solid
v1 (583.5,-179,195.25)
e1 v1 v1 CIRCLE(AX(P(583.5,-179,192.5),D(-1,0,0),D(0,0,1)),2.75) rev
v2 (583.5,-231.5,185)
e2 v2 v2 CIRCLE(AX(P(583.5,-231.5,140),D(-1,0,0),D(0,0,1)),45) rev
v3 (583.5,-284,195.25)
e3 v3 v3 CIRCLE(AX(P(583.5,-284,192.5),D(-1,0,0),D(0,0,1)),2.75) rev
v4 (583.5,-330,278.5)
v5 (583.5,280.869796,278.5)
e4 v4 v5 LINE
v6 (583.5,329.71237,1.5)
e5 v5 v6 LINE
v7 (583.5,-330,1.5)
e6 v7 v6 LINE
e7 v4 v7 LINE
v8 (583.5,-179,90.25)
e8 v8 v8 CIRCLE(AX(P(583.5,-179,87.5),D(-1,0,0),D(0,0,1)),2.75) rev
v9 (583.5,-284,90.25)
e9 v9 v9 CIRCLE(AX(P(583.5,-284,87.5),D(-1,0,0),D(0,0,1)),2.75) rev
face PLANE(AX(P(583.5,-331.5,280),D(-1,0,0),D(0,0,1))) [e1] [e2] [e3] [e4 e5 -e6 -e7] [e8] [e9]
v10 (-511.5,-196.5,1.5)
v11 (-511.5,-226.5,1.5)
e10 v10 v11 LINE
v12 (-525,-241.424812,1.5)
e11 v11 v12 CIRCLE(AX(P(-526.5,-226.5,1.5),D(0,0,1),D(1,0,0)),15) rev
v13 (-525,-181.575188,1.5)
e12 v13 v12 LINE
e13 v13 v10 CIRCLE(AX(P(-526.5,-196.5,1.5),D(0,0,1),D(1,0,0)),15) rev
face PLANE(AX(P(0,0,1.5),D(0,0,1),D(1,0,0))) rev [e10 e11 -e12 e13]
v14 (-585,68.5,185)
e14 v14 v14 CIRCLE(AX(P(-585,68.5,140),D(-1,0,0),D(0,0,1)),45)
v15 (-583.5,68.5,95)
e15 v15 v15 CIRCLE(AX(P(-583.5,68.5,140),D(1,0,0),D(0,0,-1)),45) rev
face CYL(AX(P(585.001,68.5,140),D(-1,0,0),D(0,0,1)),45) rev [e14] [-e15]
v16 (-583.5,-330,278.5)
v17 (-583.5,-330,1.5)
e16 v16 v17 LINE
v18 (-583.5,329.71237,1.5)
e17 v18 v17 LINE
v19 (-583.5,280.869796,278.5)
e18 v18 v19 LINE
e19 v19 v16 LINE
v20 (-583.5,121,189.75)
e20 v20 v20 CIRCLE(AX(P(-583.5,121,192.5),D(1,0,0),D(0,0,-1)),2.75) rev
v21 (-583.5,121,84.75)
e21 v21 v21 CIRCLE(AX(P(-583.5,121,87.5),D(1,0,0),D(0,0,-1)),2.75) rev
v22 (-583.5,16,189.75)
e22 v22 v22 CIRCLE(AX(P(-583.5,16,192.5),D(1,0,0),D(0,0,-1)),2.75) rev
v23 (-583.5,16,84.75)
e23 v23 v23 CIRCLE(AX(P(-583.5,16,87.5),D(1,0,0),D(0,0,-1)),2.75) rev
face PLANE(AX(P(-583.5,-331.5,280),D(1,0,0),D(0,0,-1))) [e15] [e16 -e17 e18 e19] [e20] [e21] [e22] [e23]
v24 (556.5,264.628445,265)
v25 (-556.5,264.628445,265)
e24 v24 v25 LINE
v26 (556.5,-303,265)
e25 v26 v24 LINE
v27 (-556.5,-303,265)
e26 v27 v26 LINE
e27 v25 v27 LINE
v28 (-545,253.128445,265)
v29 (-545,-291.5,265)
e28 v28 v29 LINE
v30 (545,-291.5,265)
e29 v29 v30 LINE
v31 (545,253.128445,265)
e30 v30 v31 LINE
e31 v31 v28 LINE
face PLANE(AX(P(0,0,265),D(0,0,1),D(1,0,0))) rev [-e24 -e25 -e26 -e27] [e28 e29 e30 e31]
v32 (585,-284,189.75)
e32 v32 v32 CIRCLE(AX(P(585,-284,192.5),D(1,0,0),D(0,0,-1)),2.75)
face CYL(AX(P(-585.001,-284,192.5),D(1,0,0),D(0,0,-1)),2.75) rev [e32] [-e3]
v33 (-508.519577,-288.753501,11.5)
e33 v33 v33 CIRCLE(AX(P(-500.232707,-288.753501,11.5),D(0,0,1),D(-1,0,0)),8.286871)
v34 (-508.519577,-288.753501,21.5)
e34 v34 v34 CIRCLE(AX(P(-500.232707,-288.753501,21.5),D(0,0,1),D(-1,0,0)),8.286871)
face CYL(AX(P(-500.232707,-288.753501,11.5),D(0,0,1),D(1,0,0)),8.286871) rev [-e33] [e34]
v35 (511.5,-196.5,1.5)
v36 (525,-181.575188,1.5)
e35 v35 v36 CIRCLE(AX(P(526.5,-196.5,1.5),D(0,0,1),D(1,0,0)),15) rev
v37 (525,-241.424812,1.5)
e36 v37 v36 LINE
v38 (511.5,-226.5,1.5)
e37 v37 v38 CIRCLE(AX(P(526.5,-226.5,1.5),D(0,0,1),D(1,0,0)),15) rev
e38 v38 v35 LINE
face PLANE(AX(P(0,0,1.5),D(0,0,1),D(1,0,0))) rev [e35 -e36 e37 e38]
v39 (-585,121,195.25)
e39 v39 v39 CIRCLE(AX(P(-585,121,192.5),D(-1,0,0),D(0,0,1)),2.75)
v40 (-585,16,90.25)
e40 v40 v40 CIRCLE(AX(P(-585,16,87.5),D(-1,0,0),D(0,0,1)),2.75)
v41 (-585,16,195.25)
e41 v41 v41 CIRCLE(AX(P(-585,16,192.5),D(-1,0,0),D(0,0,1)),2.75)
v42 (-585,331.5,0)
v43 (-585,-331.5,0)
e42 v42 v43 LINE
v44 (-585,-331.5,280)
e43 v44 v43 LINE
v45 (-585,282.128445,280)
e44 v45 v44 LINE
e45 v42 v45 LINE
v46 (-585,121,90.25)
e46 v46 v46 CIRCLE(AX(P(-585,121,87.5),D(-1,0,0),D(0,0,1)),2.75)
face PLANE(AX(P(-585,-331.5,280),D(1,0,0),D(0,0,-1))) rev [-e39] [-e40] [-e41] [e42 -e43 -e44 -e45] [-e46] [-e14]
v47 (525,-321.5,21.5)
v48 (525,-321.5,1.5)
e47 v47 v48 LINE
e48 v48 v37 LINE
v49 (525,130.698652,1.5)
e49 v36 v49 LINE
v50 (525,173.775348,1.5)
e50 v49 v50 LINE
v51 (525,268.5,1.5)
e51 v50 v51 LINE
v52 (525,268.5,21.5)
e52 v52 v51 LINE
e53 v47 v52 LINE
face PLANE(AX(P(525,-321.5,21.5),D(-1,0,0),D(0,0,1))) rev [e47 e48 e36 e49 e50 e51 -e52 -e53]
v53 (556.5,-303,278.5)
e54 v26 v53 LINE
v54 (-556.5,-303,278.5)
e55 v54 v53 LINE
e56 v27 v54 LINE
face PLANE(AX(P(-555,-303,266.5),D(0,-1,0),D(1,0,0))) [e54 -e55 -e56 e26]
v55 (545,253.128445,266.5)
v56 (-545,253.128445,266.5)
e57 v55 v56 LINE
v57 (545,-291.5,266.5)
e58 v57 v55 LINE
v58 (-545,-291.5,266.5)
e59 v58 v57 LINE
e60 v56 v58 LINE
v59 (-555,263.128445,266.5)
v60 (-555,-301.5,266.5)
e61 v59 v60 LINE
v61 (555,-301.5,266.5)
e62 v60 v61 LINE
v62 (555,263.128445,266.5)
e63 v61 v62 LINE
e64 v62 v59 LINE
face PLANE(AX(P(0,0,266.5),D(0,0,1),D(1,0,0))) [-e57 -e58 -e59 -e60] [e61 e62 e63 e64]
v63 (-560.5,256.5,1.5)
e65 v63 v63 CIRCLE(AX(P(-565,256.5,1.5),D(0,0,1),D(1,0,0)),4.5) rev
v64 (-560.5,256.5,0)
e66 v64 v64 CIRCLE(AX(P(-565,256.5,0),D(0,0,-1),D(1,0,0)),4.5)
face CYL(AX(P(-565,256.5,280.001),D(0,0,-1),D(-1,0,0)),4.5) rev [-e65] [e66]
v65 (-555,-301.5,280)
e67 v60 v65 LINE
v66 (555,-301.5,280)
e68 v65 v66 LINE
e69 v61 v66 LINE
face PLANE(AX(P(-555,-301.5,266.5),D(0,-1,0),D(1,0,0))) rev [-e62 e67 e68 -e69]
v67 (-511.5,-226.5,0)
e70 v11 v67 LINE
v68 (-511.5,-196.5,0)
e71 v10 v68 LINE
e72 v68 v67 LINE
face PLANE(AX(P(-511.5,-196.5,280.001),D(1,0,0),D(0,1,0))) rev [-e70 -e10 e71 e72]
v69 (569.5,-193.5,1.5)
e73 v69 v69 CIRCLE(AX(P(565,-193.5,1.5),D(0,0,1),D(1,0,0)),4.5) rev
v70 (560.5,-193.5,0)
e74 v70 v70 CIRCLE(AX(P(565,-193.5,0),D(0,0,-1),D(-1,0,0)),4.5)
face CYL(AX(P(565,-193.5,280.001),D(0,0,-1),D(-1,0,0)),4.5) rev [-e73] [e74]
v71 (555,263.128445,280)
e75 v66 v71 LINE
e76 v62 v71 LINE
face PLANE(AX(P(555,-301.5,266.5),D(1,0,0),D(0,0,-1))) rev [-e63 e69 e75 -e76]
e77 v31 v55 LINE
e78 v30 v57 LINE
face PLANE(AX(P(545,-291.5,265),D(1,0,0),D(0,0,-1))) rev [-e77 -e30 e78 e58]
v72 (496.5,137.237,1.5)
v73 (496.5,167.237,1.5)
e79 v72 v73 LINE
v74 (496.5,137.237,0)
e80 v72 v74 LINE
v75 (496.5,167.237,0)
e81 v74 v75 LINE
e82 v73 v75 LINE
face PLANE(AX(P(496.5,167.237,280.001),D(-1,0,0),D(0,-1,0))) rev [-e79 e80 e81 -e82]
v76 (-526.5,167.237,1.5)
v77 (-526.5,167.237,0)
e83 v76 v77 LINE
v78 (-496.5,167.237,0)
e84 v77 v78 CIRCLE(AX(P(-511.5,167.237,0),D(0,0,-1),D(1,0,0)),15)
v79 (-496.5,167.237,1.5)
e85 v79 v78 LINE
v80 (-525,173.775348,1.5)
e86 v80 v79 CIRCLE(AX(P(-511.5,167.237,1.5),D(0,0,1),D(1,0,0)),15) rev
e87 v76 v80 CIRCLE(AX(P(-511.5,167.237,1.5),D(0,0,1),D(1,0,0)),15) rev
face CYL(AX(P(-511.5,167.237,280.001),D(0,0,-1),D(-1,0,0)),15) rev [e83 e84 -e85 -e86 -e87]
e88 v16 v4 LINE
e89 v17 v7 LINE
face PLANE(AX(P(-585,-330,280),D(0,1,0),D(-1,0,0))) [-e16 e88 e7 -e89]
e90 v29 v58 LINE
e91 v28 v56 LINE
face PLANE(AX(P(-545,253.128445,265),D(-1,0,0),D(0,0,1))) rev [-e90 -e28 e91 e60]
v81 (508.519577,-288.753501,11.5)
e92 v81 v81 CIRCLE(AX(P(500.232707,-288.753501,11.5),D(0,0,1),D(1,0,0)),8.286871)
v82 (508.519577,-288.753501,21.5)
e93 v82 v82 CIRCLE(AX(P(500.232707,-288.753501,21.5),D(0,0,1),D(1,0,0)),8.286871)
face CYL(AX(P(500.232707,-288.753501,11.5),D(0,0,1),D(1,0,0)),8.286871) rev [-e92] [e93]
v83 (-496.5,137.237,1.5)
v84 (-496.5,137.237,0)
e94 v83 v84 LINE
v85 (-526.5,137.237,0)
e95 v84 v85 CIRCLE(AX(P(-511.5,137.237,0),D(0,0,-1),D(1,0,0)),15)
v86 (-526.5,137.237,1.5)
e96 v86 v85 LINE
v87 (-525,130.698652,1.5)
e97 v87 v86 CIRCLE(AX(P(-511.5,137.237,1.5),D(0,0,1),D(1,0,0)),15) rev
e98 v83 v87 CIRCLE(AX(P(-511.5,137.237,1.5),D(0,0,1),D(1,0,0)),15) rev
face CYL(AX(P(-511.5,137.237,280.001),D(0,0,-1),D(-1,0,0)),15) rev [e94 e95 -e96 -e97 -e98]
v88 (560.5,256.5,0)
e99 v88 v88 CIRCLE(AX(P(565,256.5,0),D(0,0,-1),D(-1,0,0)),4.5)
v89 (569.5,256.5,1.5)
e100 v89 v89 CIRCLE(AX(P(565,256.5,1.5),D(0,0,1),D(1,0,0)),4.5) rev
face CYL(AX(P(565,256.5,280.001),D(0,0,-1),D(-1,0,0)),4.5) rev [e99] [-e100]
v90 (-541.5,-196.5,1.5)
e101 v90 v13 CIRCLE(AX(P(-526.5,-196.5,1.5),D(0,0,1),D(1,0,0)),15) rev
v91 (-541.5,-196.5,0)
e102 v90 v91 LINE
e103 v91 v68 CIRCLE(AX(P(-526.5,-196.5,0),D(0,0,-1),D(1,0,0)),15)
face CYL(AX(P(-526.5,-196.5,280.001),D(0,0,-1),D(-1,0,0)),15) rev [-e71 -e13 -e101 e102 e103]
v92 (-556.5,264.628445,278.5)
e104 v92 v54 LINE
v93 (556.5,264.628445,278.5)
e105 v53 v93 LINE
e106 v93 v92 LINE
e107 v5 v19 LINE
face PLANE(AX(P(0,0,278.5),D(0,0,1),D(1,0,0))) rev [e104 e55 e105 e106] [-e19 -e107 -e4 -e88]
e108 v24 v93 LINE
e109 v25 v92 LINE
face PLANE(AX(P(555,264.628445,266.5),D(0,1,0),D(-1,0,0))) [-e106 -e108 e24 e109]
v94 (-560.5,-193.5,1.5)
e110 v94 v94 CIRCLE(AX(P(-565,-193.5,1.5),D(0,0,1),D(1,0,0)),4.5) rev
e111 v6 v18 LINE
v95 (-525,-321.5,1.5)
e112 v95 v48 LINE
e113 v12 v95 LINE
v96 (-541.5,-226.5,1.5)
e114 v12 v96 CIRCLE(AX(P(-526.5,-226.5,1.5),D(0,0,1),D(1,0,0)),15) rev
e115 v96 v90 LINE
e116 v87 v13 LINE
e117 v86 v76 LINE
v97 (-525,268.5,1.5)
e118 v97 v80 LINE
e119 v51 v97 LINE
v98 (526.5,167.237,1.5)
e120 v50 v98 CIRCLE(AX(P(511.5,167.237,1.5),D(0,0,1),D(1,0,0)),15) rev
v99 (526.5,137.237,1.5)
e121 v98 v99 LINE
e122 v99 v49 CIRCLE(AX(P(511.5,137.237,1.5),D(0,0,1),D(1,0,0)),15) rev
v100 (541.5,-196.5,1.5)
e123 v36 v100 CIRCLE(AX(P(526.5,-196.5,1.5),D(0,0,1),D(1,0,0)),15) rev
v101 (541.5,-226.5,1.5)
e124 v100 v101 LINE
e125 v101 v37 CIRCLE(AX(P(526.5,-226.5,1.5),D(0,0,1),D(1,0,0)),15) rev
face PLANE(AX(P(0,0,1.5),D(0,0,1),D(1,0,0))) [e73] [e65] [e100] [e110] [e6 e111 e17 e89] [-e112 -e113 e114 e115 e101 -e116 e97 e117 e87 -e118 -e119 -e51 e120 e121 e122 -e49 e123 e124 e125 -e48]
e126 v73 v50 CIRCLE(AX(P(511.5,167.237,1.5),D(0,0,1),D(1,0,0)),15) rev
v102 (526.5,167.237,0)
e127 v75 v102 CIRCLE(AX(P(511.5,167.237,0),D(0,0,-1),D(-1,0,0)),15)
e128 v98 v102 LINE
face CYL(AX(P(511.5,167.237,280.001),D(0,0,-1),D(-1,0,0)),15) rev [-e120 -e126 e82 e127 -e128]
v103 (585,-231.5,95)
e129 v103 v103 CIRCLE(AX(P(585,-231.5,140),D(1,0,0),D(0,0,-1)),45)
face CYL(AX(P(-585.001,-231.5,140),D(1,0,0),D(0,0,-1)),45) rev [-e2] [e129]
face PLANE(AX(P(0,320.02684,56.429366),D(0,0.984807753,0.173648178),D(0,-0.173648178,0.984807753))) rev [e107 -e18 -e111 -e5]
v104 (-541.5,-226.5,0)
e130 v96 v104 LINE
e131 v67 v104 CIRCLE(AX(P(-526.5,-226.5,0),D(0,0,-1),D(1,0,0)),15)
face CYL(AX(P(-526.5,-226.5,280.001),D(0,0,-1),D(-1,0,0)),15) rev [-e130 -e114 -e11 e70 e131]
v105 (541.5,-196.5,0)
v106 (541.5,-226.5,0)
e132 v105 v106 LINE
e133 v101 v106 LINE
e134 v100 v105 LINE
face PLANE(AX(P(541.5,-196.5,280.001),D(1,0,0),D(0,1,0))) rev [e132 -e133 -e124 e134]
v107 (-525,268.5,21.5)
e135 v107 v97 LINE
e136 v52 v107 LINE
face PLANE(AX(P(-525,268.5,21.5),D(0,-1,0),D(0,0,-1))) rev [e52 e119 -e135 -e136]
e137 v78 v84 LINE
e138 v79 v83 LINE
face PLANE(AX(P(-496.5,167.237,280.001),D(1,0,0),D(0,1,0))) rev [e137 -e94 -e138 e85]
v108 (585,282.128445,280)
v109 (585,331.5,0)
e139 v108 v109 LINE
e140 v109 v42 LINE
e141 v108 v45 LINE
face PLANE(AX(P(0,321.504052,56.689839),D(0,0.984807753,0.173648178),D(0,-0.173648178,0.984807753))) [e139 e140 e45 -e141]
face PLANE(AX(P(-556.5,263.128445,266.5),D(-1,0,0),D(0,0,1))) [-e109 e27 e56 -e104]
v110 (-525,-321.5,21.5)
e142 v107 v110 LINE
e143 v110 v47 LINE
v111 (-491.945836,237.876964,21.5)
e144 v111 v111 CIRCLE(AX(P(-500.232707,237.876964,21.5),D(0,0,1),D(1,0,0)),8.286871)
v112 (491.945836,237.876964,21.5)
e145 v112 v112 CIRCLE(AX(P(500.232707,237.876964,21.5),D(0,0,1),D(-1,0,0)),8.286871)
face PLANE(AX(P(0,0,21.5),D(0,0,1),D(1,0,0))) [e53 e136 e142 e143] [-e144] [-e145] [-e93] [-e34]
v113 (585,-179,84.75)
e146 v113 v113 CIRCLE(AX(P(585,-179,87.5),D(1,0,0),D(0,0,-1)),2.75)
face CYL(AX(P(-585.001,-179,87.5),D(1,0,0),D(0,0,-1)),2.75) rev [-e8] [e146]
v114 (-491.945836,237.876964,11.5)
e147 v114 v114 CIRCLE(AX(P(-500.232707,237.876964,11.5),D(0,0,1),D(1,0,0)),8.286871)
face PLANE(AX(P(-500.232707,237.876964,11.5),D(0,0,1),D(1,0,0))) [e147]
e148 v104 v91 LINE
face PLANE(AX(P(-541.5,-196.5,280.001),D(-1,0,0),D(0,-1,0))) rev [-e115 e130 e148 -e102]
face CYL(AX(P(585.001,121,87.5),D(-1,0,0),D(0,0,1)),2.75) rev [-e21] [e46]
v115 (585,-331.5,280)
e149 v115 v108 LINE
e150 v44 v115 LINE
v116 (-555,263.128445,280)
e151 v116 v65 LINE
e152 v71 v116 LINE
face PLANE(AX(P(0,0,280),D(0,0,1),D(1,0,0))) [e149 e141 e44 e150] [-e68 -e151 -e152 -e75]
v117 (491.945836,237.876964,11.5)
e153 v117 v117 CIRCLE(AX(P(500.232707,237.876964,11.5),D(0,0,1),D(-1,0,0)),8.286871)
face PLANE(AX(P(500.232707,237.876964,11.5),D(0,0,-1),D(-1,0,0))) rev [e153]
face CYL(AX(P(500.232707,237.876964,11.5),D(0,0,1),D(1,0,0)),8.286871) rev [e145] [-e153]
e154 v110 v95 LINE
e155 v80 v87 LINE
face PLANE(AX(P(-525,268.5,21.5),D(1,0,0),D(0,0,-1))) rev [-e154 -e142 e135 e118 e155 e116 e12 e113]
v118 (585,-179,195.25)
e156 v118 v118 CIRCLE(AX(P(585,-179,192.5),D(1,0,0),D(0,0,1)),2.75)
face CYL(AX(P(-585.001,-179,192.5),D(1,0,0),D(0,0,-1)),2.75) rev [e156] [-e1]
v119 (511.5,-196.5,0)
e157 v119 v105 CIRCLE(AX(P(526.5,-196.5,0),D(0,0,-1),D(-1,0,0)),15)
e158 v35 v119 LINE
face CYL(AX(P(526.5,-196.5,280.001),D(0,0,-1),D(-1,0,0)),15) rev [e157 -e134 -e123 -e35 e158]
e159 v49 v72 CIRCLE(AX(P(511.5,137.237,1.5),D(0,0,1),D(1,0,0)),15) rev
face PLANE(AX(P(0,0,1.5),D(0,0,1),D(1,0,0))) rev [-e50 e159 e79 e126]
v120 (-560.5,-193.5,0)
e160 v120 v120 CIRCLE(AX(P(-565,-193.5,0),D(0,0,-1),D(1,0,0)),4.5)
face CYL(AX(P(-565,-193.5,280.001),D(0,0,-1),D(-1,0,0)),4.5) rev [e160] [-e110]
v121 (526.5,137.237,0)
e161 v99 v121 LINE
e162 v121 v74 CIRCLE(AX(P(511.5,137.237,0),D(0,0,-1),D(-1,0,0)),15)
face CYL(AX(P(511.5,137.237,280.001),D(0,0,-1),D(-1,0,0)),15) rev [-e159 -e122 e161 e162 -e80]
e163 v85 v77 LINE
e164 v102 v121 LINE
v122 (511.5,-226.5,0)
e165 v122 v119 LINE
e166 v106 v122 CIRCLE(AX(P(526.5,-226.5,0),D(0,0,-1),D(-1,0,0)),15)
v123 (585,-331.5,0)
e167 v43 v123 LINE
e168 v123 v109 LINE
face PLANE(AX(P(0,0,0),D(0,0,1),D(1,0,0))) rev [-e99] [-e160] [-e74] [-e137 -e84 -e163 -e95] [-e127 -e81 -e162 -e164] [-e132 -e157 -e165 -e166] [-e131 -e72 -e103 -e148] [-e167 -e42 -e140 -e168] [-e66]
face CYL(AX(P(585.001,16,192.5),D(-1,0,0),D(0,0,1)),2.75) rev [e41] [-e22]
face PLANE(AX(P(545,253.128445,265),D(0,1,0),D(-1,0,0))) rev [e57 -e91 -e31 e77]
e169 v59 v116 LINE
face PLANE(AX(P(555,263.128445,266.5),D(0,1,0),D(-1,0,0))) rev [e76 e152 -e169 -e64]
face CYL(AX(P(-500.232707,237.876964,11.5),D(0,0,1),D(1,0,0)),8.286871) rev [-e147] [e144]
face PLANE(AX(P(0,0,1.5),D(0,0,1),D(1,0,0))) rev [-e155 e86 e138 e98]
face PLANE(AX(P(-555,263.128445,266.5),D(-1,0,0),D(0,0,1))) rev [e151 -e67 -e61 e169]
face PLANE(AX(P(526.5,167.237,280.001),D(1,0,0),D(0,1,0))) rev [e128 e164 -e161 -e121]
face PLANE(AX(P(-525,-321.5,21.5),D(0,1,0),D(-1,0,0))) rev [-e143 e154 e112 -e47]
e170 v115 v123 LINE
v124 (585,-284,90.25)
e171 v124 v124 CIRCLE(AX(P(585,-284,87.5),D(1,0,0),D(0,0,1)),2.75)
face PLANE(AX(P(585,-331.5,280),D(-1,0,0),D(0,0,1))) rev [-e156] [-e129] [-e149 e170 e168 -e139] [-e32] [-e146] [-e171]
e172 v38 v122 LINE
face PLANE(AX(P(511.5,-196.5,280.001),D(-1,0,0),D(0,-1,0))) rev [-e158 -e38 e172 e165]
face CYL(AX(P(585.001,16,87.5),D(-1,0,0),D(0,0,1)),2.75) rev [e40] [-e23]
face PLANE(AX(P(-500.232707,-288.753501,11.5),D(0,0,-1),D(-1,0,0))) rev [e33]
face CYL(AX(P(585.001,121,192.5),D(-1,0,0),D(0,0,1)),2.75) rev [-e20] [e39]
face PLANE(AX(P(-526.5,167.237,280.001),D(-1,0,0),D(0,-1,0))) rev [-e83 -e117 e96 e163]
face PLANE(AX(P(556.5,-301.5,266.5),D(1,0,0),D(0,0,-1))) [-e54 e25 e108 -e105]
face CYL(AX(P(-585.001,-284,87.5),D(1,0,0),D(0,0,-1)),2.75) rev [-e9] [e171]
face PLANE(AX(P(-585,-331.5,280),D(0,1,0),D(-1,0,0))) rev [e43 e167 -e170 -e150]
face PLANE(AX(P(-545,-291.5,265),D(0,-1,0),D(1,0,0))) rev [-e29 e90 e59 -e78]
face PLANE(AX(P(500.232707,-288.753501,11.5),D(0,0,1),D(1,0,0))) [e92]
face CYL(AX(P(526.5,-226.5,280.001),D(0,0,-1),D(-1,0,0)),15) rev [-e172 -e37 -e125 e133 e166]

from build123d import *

# Parameters (mm, degrees)
SKETCH_1_W          = 1170
SKETCH_1_H          = 663
EXTRUDE_1_DEPTH     = 280
SKETCH_2_W          = 1110
SKETCH_2_H          = 564.628445402
CUT_EXTRUDE_1_DEPTH = 13.5
SKETCH_4_W          = 1090
SKETCH_4_H          = 544.628445402
CUT_EXTRUDE_2_DEPTH = 1.5
SHELL_START         = -583.5
SHELL_1_DEPTH       = 1167
SHELL_1_2_OUTLINE_W = 567.628445402
SHELL_1_2_OUTLINE_H = 13.5
SHELL_1_2_DEPTH     = 27
SHELL_START_2       = 556.5
SHELL_1_3_OUTLINE_W = 567.628445402
SHELL_1_3_OUTLINE_H = 13.5
SHELL_1_3_DEPTH     = 27
CUT_EXTRUDE_3_REACH = 730.366
SKETCH_5_R          = 4.5
CUT_EXTRUDE_4_REACH = 1249.875
SKETCH_6_R          = 45
SKETCH_6_R_2        = 2.75
CUT_EXTRUDE_6_REACH = 1249.875
SKETCH_8_R          = 45
SKETCH_8_R_2        = 2.75
SKETCH_9_W          = 1050
SKETCH_9_H          = 590
EXTRUDE_2_DEPTH     = 20
SKETCH_10_R         = 8.286870523
CUT_EXTRUDE_7_DEPTH = 10


# Read off the part's stored shape, not the designer's step: 抽壳1
with BuildPart() as part:
    # 草图1 → 凸台-拉伸1 (new body)
    with BuildSketch(Plane.XY):
        Rectangle(SKETCH_1_W, SKETCH_1_H)
    extrude(amount=EXTRUDE_1_DEPTH)

    # Split Bodies 1
    split(bisect_by=Plane(origin=(0, 321.504051895, 56.689838756), x_dir=(0, -0.17364817766691376, 0.984807753012211), z_dir=(0, 0.984807753012211, 0.17364817766691376)), keep=Keep.BOTTOM)

    # 草图2 → 切除-拉伸1 (cut)
    with BuildSketch(Plane.XY.offset(280)):
        with Locations((0, -19.185777299)):
            Rectangle(SKETCH_2_W, SKETCH_2_H)
    extrude(amount=-CUT_EXTRUDE_1_DEPTH, mode=Mode.SUBTRACT)

    # 草图4 → 切除-拉伸2 (cut)
    with BuildSketch(Plane.XY.offset(266.5)):
        with Locations((0, -19.185777299)):
            Rectangle(SKETCH_4_W, SKETCH_4_H)
    extrude(amount=-CUT_EXTRUDE_2_DEPTH, mode=Mode.SUBTRACT)

    # 抽壳1 outline → 抽壳1 (cut)
    with BuildSketch(Plane.YZ.offset(SHELL_START)):
        Polygon((-330, 1.5), (329.712369611, 1.5), (280.869795955, 278.5), (264.628445402, 278.5), (264.628445402, 265), (-303, 265), (-303, 278.5), (-330, 278.5), align=None)
    extrude(amount=SHELL_1_DEPTH, mode=Mode.SUBTRACT)

    # Shell 1 2 outline → Shell 1 2 (cut)
    with BuildSketch(Plane.YZ.offset(SHELL_START)):
        with Locations((-19.185777299, 271.75)):
            Rectangle(SHELL_1_2_OUTLINE_W, SHELL_1_2_OUTLINE_H)
    extrude(amount=SHELL_1_2_DEPTH, mode=Mode.SUBTRACT)

    # Shell 1 3 outline → Shell 1 3 (cut)
    with BuildSketch(Plane.YZ.offset(SHELL_START_2)):
        with Locations((-19.185777299, 271.75)):
            Rectangle(SHELL_1_3_OUTLINE_W, SHELL_1_3_OUTLINE_H)
    extrude(amount=SHELL_1_3_DEPTH, mode=Mode.SUBTRACT)

    # 草图5 → 切除-拉伸3 (cut, up to next)
    with BuildSketch(Plane(origin=(0, 0, 0), x_dir=(-1, 0, 0), z_dir=(0, 0, -1)), mode=Mode.PRIVATE) as cut_extrude_3_sk1:
        with Locations((-565, 256.5)):
            Circle(SKETCH_5_R)
    cut_extrude_3_tool1 = extrude(cut_extrude_3_sk1.sketch, amount=-CUT_EXTRUDE_3_REACH, mode=Mode.PRIVATE) & part.part
    # 草图5 → 切除-拉伸3 (cut, up to next)
    with BuildSketch(Plane(origin=(0, 0, 0), x_dir=(-1, 0, 0), z_dir=(0, 0, -1)), mode=Mode.PRIVATE) as cut_extrude_3_sk2:
        with Locations((-565, -193.5)):
            Circle(SKETCH_5_R)
    cut_extrude_3_tool2 = extrude(cut_extrude_3_sk2.sketch, amount=-CUT_EXTRUDE_3_REACH, mode=Mode.PRIVATE) & part.part
    # 草图5 → 切除-拉伸3 (cut, up to next)
    with BuildSketch(Plane(origin=(0, 0, 0), x_dir=(-1, 0, 0), z_dir=(0, 0, -1)), mode=Mode.PRIVATE) as cut_extrude_3_sk3:
        with Locations(Location((565, 256.5, 0), (0, 0, 180))):
            Circle(SKETCH_5_R)
    cut_extrude_3_tool3 = extrude(cut_extrude_3_sk3.sketch, amount=-CUT_EXTRUDE_3_REACH, mode=Mode.PRIVATE) & part.part
    # 草图5 → 切除-拉伸3 (cut, up to next)
    with BuildSketch(Plane(origin=(0, 0, 0), x_dir=(-1, 0, 0), z_dir=(0, 0, -1)), mode=Mode.PRIVATE) as cut_extrude_3_sk4:
        with Locations(Location((565, -193.5, 0), (0, 0, 180))):
            Circle(SKETCH_5_R)
    cut_extrude_3_tool4 = extrude(cut_extrude_3_sk4.sketch, amount=-CUT_EXTRUDE_3_REACH, mode=Mode.PRIVATE) & part.part
    # 草图5 → 切除-拉伸3 (cut, up to next)
    with BuildSketch(Plane(origin=(0, 0, 0), x_dir=(-1, 0, 0), z_dir=(0, 0, -1)), mode=Mode.PRIVATE) as cut_extrude_3_sk5:
        with BuildLine():
            Line((511.5, -196.5), (511.5, -226.5))
            ThreePointArc((511.5, -226.5), (526.5, -241.5), (541.5, -226.5))
            Line((541.5, -226.5), (541.5, -196.5))
            ThreePointArc((541.5, -196.5), (526.5, -181.5), (511.5, -196.5))
        make_face()
    cut_extrude_3_tool5 = extrude(cut_extrude_3_sk5.sketch, amount=-CUT_EXTRUDE_3_REACH, mode=Mode.PRIVATE) & part.part
    # 草图5 → 切除-拉伸3 (cut, up to next)
    with BuildSketch(Plane(origin=(0, 0, 0), x_dir=(-1, 0, 0), z_dir=(0, 0, -1)), mode=Mode.PRIVATE) as cut_extrude_3_sk6:
        with BuildLine():
            Line((526.5, 167.237), (526.5, 137.237))
            ThreePointArc((526.5, 137.237), (511.5, 122.237), (496.5, 137.237))
            Line((496.5, 137.237), (496.5, 167.237))
            ThreePointArc((496.5, 167.237), (511.5, 182.237), (526.5, 167.237))
        make_face()
    cut_extrude_3_tool6 = extrude(cut_extrude_3_sk6.sketch, amount=-CUT_EXTRUDE_3_REACH, mode=Mode.PRIVATE) & part.part
    # 草图5 → 切除-拉伸3 (cut, up to next)
    with BuildSketch(Plane(origin=(0, 0, 0), x_dir=(-1, 0, 0), z_dir=(0, 0, -1)), mode=Mode.PRIVATE) as cut_extrude_3_sk7:
        with BuildLine():
            Line((-541.5, -196.5), (-541.5, -226.5))
            ThreePointArc((-541.5, -226.5), (-526.5, -241.5), (-511.5, -226.5))
            Line((-511.5, -226.5), (-511.5, -196.5))
            ThreePointArc((-511.5, -196.5), (-526.5, -181.5), (-541.5, -196.5))
        make_face()
    cut_extrude_3_tool7 = extrude(cut_extrude_3_sk7.sketch, amount=-CUT_EXTRUDE_3_REACH, mode=Mode.PRIVATE) & part.part
    # 草图5 → 切除-拉伸3 (cut, up to next)
    with BuildSketch(Plane(origin=(0, 0, 0), x_dir=(-1, 0, 0), z_dir=(0, 0, -1)), mode=Mode.PRIVATE) as cut_extrude_3_sk8:
        with BuildLine():
            Line((-496.5, 167.237), (-496.5, 137.237))
            ThreePointArc((-496.5, 137.237), (-511.5, 122.237), (-526.5, 137.237))
            Line((-526.5, 137.237), (-526.5, 167.237))
            ThreePointArc((-526.5, 167.237), (-511.5, 182.237), (-496.5, 167.237))
        make_face()
    cut_extrude_3_tool8 = extrude(cut_extrude_3_sk8.sketch, amount=-CUT_EXTRUDE_3_REACH, mode=Mode.PRIVATE) & part.part
    add(cut_extrude_3_tool1.solids().sort_by_distance((565, 256.5, 0))[0], mode=Mode.SUBTRACT)
    add(cut_extrude_3_tool2.solids().sort_by_distance((565, -193.5, 0))[0], mode=Mode.SUBTRACT)
    add(cut_extrude_3_tool3.solids().sort_by_distance((-565, 256.5, 0))[0], mode=Mode.SUBTRACT)
    add(cut_extrude_3_tool4.solids().sort_by_distance((-565, -193.5, 0))[0], mode=Mode.SUBTRACT)
    add(cut_extrude_3_tool5.solids().sort_by_distance((-526.5, -211.5, 0))[0], mode=Mode.SUBTRACT)
    add(cut_extrude_3_tool6.solids().sort_by_distance((-511.5, 152.237, 0))[0], mode=Mode.SUBTRACT)
    add(cut_extrude_3_tool7.solids().sort_by_distance((526.5, -211.5, 0))[0], mode=Mode.SUBTRACT)
    add(cut_extrude_3_tool8.solids().sort_by_distance((511.5, 152.237, 0))[0], mode=Mode.SUBTRACT)

    # 草图6 → 切除-拉伸4 (cut, up to next)
    with BuildSketch(Plane(origin=(585, 0, 0), x_dir=(0, 0, -1), z_dir=(1, 0, 0)), mode=Mode.PRIVATE) as cut_extrude_4_sk1:
        with Locations((-140, -231.5)):
            Circle(SKETCH_6_R)
    cut_extrude_4_tool1 = extrude(cut_extrude_4_sk1.sketch, amount=-CUT_EXTRUDE_4_REACH, mode=Mode.PRIVATE) & part.part
    # 草图6 → 切除-拉伸4 (cut, up to next)
    with BuildSketch(Plane(origin=(585, 0, 0), x_dir=(0, 0, -1), z_dir=(1, 0, 0)), mode=Mode.PRIVATE) as cut_extrude_4_sk2:
        with Locations((-87.5, -179)):
            Circle(SKETCH_6_R_2)
    cut_extrude_4_tool2 = extrude(cut_extrude_4_sk2.sketch, amount=-CUT_EXTRUDE_4_REACH, mode=Mode.PRIVATE) & part.part
    # 草图6 → 切除-拉伸4 (cut, up to next)
    with BuildSketch(Plane(origin=(585, 0, 0), x_dir=(0, 0, -1), z_dir=(1, 0, 0)), mode=Mode.PRIVATE) as cut_extrude_4_sk3:
        with Locations(Location((-192.5, -179, 0), (0, 0, 180))):
            Circle(SKETCH_6_R_2)
    cut_extrude_4_tool3 = extrude(cut_extrude_4_sk3.sketch, amount=-CUT_EXTRUDE_4_REACH, mode=Mode.PRIVATE) & part.part
    # 草图6 → 切除-拉伸4 (cut, up to next)
    with BuildSketch(Plane(origin=(585, 0, 0), x_dir=(0, 0, -1), z_dir=(1, 0, 0)), mode=Mode.PRIVATE) as cut_extrude_4_sk4:
        with Locations((-192.5, -284)):
            Circle(SKETCH_6_R_2)
    cut_extrude_4_tool4 = extrude(cut_extrude_4_sk4.sketch, amount=-CUT_EXTRUDE_4_REACH, mode=Mode.PRIVATE) & part.part
    # 草图6 → 切除-拉伸4 (cut, up to next)
    with BuildSketch(Plane(origin=(585, 0, 0), x_dir=(0, 0, -1), z_dir=(1, 0, 0)), mode=Mode.PRIVATE) as cut_extrude_4_sk5:
        with Locations(Location((-87.5, -284, 0), (0, 0, 180))):
            Circle(SKETCH_6_R_2)
    cut_extrude_4_tool5 = extrude(cut_extrude_4_sk5.sketch, amount=-CUT_EXTRUDE_4_REACH, mode=Mode.PRIVATE) & part.part
    add(cut_extrude_4_tool1.solids().sort_by_distance((585, -231.5, 140))[0], mode=Mode.SUBTRACT)
    add(cut_extrude_4_tool2.solids().sort_by_distance((585, -179, 87.5))[0], mode=Mode.SUBTRACT)
    add(cut_extrude_4_tool3.solids().sort_by_distance((585, -179, 192.5))[0], mode=Mode.SUBTRACT)
    add(cut_extrude_4_tool4.solids().sort_by_distance((585, -284, 192.5))[0], mode=Mode.SUBTRACT)
    add(cut_extrude_4_tool5.solids().sort_by_distance((585, -284, 87.5))[0], mode=Mode.SUBTRACT)

    # 草图8 → 切除-拉伸6 (cut, up to next)
    with BuildSketch(Plane.ZY.offset(585), mode=Mode.PRIVATE) as cut_extrude_6_sk1:
        with Locations((140, 68.5)):
            Circle(SKETCH_8_R)
    cut_extrude_6_tool1 = extrude(cut_extrude_6_sk1.sketch, amount=-CUT_EXTRUDE_6_REACH, mode=Mode.PRIVATE) & part.part
    # 草图8 → 切除-拉伸6 (cut, up to next)
    with BuildSketch(Plane.ZY.offset(585), mode=Mode.PRIVATE) as cut_extrude_6_sk2:
        with Locations((192.5, 16)):
            Circle(SKETCH_8_R_2)
    cut_extrude_6_tool2 = extrude(cut_extrude_6_sk2.sketch, amount=-CUT_EXTRUDE_6_REACH, mode=Mode.PRIVATE) & part.part
    # 草图8 → 切除-拉伸6 (cut, up to next)
    with BuildSketch(Plane.ZY.offset(585), mode=Mode.PRIVATE) as cut_extrude_6_sk3:
        with Locations((87.5, 16)):
            Circle(SKETCH_8_R_2)
    cut_extrude_6_tool3 = extrude(cut_extrude_6_sk3.sketch, amount=-CUT_EXTRUDE_6_REACH, mode=Mode.PRIVATE) & part.part
    # 草图8 → 切除-拉伸6 (cut, up to next)
    with BuildSketch(Plane.ZY.offset(585), mode=Mode.PRIVATE) as cut_extrude_6_sk4:
        with Locations((87.5, 121)):
            Circle(SKETCH_8_R_2)
    cut_extrude_6_tool4 = extrude(cut_extrude_6_sk4.sketch, amount=-CUT_EXTRUDE_6_REACH, mode=Mode.PRIVATE) & part.part
    # 草图8 → 切除-拉伸6 (cut, up to next)
    with BuildSketch(Plane.ZY.offset(585), mode=Mode.PRIVATE) as cut_extrude_6_sk5:
        with Locations((192.5, 121)):
            Circle(SKETCH_8_R_2)
    cut_extrude_6_tool5 = extrude(cut_extrude_6_sk5.sketch, amount=-CUT_EXTRUDE_6_REACH, mode=Mode.PRIVATE) & part.part
    add(cut_extrude_6_tool1.solids().sort_by_distance((-585, 68.5, 140))[0], mode=Mode.SUBTRACT)
    add(cut_extrude_6_tool2.solids().sort_by_distance((-585, 16, 192.5))[0], mode=Mode.SUBTRACT)
    add(cut_extrude_6_tool3.solids().sort_by_distance((-585, 16, 87.5))[0], mode=Mode.SUBTRACT)
    add(cut_extrude_6_tool4.solids().sort_by_distance((-585, 121, 87.5))[0], mode=Mode.SUBTRACT)
    add(cut_extrude_6_tool5.solids().sort_by_distance((-585, 121, 192.5))[0], mode=Mode.SUBTRACT)

    # 草图9 → 凸台-拉伸2 (add)
    with BuildSketch(Plane.XY.offset(1.5)):
        with Locations((0, -26.5)):
            Rectangle(SKETCH_9_W, SKETCH_9_H)
    extrude(amount=EXTRUDE_2_DEPTH)

    # 草图10 → 切除-拉伸7 (cut)
    with BuildSketch(Plane.XY.offset(21.5)):
        with Locations((-500.232706652, 237.876964373)):
            Circle(SKETCH_10_R)
        with Locations(Location((500.232706652, 237.876964373, 0), (0, 0, 180))):
            Circle(SKETCH_10_R)
        with Locations((500.232706652, -288.753501232)):
            Circle(SKETCH_10_R)
        with Locations(Location((-500.232706652, -288.753501232, 0), (0, 0, 180))):
            Circle(SKETCH_10_R)
    extrude(amount=-CUT_EXTRUDE_7_DEPTH, mode=Mode.SUBTRACT)


solid = part.part
